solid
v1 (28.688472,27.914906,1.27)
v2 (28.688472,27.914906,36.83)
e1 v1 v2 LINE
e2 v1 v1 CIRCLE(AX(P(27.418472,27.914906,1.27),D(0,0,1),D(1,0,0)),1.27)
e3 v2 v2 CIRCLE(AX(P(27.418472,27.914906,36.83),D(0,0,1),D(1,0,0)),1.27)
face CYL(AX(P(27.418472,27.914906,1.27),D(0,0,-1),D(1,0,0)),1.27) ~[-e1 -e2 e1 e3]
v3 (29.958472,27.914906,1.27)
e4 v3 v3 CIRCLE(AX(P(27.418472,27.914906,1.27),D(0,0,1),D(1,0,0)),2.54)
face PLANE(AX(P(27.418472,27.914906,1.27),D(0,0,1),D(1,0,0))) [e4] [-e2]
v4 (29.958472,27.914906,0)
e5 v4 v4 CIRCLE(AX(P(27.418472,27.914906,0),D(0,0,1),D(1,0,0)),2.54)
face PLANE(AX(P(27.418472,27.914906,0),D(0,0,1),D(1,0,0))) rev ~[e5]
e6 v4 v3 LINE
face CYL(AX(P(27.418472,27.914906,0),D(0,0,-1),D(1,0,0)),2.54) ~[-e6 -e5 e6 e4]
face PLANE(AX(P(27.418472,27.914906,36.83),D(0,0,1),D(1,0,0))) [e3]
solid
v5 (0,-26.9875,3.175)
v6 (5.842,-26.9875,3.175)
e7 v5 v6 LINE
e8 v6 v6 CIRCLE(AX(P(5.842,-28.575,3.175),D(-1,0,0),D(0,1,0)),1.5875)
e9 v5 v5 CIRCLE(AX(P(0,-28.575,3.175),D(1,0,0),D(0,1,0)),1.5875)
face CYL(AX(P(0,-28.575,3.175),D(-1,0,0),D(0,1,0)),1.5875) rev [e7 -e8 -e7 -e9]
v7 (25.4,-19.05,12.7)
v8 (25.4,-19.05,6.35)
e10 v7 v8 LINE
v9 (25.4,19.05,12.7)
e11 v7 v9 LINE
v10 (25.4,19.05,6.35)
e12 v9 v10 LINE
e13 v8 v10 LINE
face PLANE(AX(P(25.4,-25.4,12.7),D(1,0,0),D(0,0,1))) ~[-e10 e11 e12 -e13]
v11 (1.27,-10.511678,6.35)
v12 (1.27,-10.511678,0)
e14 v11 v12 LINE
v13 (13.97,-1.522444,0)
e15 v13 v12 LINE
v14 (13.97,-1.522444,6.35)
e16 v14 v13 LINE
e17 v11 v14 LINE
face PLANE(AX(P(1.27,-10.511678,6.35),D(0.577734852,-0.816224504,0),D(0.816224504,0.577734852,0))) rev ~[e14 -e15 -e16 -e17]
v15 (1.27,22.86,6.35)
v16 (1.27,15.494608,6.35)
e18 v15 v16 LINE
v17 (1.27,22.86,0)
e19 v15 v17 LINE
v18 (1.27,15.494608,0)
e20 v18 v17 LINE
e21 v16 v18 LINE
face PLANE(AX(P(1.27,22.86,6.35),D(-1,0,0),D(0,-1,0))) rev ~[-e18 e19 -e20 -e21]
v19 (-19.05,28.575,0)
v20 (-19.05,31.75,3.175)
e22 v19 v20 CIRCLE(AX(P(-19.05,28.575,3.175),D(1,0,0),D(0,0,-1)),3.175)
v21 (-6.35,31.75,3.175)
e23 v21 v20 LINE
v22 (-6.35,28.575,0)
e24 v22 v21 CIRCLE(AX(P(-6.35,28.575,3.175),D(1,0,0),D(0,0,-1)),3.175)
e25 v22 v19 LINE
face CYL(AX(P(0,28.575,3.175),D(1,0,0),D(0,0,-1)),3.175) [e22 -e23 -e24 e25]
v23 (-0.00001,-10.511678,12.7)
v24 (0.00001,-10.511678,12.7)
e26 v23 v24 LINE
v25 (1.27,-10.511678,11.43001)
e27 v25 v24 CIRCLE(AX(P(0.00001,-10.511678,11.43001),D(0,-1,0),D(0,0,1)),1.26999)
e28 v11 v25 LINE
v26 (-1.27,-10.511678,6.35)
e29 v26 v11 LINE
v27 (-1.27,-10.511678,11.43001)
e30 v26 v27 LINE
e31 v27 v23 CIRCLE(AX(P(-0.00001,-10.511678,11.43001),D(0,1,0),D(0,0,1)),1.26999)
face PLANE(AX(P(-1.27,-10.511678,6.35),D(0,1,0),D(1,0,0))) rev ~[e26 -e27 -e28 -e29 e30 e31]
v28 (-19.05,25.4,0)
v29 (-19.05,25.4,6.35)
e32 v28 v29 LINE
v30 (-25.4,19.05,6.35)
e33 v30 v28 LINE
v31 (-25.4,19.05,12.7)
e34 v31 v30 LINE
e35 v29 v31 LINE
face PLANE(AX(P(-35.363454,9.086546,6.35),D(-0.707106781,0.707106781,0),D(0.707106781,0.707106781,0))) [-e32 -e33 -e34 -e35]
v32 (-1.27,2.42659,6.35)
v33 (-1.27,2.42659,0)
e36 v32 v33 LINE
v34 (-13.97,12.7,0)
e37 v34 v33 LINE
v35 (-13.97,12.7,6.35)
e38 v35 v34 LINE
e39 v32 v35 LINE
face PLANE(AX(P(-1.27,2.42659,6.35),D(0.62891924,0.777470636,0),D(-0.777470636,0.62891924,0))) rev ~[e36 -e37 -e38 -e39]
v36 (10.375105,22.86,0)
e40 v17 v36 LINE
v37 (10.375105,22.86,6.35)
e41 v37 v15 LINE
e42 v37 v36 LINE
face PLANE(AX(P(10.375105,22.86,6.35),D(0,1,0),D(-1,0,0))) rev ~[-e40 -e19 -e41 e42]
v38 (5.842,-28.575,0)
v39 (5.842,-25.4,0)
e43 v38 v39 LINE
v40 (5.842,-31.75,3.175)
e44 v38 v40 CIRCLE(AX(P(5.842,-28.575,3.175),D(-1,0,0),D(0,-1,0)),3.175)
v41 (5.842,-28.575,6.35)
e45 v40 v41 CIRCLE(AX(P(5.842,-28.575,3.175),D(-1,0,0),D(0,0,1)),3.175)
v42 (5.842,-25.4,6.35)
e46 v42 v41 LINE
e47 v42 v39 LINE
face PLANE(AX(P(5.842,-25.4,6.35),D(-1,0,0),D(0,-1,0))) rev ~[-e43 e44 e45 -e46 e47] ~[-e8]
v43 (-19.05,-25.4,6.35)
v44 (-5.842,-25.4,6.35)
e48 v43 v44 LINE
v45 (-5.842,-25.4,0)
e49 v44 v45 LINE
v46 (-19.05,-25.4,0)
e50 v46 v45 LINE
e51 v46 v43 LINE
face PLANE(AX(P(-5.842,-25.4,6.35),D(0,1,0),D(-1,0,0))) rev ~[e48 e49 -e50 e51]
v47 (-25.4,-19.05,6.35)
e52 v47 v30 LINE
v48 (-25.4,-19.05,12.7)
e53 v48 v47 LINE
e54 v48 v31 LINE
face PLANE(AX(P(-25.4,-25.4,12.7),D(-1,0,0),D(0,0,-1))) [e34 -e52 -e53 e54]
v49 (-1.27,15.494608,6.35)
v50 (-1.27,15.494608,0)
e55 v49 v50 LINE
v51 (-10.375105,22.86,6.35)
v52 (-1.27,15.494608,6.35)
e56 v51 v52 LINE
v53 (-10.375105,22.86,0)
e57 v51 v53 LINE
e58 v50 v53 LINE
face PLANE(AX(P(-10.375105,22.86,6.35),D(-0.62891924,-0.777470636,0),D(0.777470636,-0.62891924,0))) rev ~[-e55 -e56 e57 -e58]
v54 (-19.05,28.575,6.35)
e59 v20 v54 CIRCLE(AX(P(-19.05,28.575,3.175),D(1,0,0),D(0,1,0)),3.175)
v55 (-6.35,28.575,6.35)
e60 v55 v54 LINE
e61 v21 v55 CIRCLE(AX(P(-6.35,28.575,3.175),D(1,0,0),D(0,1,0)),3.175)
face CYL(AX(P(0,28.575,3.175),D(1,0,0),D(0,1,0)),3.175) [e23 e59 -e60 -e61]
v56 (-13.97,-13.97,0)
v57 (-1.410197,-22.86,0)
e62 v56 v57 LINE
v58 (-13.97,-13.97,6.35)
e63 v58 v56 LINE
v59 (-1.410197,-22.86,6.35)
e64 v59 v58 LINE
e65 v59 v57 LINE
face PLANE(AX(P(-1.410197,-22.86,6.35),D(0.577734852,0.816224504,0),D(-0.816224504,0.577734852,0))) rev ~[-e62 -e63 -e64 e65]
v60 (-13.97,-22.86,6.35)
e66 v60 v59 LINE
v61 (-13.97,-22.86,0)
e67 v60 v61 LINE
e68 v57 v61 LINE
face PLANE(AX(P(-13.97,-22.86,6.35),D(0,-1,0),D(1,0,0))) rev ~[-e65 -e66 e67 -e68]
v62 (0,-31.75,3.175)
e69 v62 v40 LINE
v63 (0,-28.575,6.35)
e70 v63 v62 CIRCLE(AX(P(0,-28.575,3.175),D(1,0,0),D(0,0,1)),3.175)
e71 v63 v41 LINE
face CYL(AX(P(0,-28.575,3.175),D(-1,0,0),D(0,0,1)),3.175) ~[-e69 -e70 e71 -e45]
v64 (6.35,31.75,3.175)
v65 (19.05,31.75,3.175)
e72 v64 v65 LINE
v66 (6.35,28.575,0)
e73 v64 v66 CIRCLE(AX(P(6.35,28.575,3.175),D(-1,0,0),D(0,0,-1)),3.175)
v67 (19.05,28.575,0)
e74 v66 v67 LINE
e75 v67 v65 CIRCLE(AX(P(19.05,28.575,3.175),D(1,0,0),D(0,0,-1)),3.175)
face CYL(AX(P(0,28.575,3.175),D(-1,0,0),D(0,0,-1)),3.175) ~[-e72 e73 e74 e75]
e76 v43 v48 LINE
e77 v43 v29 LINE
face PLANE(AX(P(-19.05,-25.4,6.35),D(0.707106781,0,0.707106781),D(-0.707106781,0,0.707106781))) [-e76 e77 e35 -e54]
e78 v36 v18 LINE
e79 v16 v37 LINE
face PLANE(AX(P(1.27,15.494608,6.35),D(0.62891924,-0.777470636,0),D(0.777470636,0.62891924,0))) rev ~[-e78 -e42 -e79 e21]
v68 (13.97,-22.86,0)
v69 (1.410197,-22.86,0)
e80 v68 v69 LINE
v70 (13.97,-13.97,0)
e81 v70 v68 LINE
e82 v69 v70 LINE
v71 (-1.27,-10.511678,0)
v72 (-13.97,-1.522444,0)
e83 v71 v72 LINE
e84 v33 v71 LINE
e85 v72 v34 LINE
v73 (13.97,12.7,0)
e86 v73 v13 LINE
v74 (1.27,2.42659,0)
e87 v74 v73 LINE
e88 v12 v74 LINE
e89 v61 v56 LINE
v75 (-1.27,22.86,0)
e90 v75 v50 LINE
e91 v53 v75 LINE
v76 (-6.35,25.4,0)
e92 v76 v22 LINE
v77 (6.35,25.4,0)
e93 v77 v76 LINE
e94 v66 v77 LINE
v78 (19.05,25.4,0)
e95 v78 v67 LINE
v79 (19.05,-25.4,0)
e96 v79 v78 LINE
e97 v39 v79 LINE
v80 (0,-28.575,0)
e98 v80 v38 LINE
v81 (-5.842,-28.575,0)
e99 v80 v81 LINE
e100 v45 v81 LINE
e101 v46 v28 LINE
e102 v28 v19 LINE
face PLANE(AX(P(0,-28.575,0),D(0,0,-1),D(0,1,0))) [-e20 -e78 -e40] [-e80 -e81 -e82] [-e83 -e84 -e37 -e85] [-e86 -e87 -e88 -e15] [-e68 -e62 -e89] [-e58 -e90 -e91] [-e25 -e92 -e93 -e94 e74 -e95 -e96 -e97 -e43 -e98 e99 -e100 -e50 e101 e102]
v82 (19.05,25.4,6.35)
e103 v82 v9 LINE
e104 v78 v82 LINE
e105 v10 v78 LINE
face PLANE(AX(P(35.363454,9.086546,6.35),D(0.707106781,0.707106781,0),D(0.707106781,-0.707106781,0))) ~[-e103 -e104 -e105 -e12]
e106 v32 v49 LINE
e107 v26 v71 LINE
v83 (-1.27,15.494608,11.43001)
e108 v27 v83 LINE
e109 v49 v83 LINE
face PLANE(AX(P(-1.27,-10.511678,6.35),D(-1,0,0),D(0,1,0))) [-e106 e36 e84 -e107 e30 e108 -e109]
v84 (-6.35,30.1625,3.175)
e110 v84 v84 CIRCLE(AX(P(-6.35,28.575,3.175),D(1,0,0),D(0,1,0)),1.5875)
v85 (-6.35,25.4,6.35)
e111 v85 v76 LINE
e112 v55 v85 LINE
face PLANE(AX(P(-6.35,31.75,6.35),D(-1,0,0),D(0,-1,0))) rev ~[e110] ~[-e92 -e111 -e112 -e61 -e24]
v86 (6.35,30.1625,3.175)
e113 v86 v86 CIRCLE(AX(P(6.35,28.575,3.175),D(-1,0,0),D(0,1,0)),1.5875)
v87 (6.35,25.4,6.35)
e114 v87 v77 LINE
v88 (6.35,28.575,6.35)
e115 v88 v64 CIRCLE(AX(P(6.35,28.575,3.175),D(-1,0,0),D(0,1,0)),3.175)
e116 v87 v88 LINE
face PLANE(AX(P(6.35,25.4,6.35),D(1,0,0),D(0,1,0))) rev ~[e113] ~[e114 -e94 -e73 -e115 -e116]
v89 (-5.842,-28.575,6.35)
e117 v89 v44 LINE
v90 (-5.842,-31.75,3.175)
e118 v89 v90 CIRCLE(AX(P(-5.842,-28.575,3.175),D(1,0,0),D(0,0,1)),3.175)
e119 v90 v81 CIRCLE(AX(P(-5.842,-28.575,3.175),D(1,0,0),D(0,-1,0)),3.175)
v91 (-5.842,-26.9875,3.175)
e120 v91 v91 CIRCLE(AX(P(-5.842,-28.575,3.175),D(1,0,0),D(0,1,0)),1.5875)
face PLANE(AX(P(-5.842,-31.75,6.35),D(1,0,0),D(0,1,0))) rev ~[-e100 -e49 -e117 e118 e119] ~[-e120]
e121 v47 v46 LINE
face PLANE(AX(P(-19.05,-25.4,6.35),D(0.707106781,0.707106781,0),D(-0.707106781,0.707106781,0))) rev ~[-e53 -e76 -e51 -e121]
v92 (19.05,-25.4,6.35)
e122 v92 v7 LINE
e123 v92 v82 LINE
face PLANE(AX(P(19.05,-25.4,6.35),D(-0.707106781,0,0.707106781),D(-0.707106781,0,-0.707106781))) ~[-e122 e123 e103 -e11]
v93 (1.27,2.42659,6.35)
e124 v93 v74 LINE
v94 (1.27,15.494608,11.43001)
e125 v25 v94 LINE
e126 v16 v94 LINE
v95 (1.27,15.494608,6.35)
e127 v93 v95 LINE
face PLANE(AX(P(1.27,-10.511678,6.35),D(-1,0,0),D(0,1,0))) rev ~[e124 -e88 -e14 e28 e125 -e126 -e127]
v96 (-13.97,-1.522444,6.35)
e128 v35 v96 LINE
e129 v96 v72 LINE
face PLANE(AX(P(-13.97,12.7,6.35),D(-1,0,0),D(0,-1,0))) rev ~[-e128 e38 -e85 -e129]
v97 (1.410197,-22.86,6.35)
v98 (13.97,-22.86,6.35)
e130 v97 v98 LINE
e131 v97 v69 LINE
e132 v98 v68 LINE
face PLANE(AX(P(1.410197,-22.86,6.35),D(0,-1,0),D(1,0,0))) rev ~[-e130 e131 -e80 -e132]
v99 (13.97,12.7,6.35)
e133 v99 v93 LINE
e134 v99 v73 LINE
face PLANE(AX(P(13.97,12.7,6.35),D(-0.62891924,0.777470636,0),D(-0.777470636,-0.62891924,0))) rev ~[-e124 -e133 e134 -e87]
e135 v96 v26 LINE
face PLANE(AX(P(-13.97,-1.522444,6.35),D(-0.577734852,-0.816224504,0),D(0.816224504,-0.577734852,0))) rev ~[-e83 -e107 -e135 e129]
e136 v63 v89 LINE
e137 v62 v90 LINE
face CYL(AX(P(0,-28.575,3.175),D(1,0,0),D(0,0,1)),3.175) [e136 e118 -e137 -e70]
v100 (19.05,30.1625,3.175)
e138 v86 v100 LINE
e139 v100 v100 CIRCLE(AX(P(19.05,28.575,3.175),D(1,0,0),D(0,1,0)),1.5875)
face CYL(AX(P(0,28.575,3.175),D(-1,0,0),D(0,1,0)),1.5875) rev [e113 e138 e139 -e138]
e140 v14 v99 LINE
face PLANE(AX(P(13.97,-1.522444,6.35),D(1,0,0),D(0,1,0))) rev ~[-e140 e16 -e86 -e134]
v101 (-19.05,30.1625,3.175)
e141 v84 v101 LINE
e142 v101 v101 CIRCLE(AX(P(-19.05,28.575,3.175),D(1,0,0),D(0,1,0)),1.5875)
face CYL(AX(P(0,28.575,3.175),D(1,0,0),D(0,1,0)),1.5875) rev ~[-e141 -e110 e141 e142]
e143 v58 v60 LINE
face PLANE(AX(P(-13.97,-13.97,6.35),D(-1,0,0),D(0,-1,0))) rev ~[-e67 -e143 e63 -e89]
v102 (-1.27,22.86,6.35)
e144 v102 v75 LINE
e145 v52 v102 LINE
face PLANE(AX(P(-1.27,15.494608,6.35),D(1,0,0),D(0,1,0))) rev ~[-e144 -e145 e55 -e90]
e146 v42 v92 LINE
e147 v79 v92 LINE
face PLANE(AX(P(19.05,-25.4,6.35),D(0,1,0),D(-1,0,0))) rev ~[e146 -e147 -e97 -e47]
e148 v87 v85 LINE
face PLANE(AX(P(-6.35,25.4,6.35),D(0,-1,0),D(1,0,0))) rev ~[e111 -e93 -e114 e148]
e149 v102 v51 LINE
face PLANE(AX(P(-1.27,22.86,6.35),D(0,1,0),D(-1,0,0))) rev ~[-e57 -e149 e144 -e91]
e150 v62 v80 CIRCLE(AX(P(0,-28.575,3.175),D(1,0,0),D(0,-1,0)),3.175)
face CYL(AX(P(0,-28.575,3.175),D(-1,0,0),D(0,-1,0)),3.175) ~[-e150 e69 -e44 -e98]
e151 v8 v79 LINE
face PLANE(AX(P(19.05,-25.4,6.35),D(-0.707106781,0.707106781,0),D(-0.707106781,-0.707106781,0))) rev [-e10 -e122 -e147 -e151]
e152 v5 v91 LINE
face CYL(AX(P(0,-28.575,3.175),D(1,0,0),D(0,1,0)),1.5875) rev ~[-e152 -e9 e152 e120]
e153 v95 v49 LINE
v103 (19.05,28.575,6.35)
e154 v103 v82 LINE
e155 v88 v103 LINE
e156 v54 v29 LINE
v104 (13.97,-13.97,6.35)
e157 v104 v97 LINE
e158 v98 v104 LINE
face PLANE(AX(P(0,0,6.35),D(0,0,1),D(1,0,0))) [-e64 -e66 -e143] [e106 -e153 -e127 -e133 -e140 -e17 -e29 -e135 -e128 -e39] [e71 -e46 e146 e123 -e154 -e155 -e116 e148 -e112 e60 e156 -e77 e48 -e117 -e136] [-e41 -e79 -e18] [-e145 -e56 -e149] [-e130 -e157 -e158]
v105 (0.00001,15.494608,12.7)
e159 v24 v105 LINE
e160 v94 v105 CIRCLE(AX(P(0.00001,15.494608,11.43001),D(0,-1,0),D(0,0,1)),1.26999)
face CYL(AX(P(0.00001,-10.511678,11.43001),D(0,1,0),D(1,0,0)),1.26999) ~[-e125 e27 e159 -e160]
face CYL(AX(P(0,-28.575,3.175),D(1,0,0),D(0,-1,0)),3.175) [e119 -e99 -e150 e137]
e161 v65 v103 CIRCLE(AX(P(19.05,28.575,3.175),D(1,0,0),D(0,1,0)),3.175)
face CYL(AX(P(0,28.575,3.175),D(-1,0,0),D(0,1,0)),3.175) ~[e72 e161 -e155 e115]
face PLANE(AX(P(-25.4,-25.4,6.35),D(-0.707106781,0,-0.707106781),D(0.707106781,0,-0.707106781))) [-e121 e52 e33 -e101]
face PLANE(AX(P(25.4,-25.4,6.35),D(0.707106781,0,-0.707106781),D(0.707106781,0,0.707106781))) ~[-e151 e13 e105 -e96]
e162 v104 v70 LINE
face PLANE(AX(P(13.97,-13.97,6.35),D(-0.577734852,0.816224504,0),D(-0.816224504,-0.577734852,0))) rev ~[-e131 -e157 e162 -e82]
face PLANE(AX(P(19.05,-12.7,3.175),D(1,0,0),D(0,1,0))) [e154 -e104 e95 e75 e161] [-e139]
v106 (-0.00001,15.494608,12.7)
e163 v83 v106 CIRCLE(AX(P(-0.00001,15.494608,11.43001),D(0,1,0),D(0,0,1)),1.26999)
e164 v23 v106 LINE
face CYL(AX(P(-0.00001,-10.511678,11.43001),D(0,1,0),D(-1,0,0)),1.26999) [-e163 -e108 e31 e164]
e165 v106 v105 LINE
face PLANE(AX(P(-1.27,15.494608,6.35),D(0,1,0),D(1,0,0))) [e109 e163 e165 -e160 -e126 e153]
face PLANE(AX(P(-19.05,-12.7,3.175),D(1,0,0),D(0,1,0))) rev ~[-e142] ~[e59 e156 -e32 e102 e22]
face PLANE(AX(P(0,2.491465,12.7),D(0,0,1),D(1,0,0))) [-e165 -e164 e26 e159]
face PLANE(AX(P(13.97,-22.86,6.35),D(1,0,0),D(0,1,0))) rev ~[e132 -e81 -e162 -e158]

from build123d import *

# Parameters (mm, degrees)
F0_W      = 38.1
F0_H      = 50.8
F1_DEPTH  = 6.35
F3_DEPTH  = 50.8
F4_W      = 25.4
F4_H      = 6.35
F4_R      = 1.5875
F5_DEPTH  = 19.05
F6_W      = 12.7
F6_H      = 3.175
F6_W_2    = 0.508
F7_DEPTH  = 25.4
F9_DEPTH  = 12.7
F13_DEPTH = 6.351
F14_W     = 2.54
F14_H     = 26.006285722
F15_DEPTH = 6.35
F16_R     = 1.26999
F17_R     = 2.54
F18_DEPTH = 1.27
F19_R     = 1.27
F20_DEPTH = 35.56


# Not quite as in the source:
# - a fillet or chamfer is up to 0.001 mm smaller than in the source, because OpenCascade refuses the exact size


with BuildPart() as f1:
    # F0 (on Top) → F1 (new body)
    with BuildSketch(Plane.XY):
        Rectangle(F0_W, F0_H)
    extrude(amount=F1_DEPTH)

    # F2 (on face) → F3 (join, through all)
    with BuildSketch(Plane.XZ.offset(25.4)):
        Polygon((-19.05, 0), (-19.05, 6.35), (-25.4, 12.7), (-25.4, 6.35), align=None)
    extrude(amount=-F3_DEPTH)

    # F4 (on Right) → F5 (join, symmetric)
    with BuildSketch(Plane.YZ):
        with Locations((-12.7, 3.175)):
            Rectangle(F4_W, F4_H)
        with Locations((12.7, 3.175)):
            Rectangle(F4_W, F4_H)
        with BuildLine():
            Line((-28.575, 0), (-25.4, 0))
            Line((-25.4, 0), (-25.4, 6.35))
            Line((-25.4, 6.35), (-28.575, 6.35))
            ThreePointArc((-28.575, 6.35), (-30.8200640303, 5.4200640303), (-31.75, 3.175))
            ThreePointArc((-31.75, 3.175), (-30.8200640303, 0.9299359697), (-28.575, 0))
        make_face()
        with Locations((-28.575, 3.175)):
            Circle(F4_R, mode=Mode.SUBTRACT)
        with BuildLine():
            Line((25.4, 6.35), (25.4, 0))
            Line((25.4, 0), (28.575, 0))
            ThreePointArc((28.575, 0), (30.8200640303, 0.9299359697), (31.75, 3.175))
            ThreePointArc((31.75, 3.175), (30.8200640303, 5.4200640303), (28.575, 6.35))
            Line((28.575, 6.35), (25.4, 6.35))
        make_face()
        with Locations((28.575, 3.175)):
            Circle(F4_R, mode=Mode.SUBTRACT)
    extrude(amount=F5_DEPTH, both=True)

    # F6 (on face) → F7 (cut)
    with BuildSketch(Plane.XY.offset(6.35)):
        with Locations((0, 30.1625)):
            Rectangle(F6_W, F6_H)
        with Locations((0, 26.9875)):
            Rectangle(F6_W, F6_H)
        with Locations((12.7, -30.1625)):
            Rectangle(F6_W, F6_H)
        with Locations((12.7, -26.9875)):
            Rectangle(F6_W, F6_H)
        with Locations((6.096, -26.9875)):
            Rectangle(F6_W_2, F6_H)
        with Locations((6.096, -30.1625)):
            Rectangle(F6_W_2, F6_H)
        with Locations((-12.7, -30.1625)):
            Rectangle(F6_W, F6_H)
        with Locations((-12.7, -26.9875)):
            Rectangle(F6_W, F6_H)
        with Locations((-6.096, -26.9875)):
            Rectangle(F6_W_2, F6_H)
        with Locations((-6.096, -30.1625)):
            Rectangle(F6_W_2, F6_H)
    extrude(amount=-F7_DEPTH, mode=Mode.SUBTRACT)

    # F8 (on face) → F9 (cut, symmetric)
    with BuildSketch(Plane.XY.offset(6.35)):
        Polygon((-35.3634544947, 9.0865455053), (-19.05, 25.4), (-35.675508843, 25.4), align=None)
        Polygon((-34.7037734637, -25.4), (-19.05, -25.4), (-35.0090485041, -9.4409514959), align=None)
    extrude(amount=F9_DEPTH, both=True, mode=Mode.SUBTRACT)

    # F11: F1 across plane


with BuildPart() as f1_1:
    add(f1.part)
    add(f1.part.mirror(Plane(origin=(0, 2.2576834917, 3.175), x_dir=(0, 1, 0), z_dir=(1, 0, 0))))

    # F12 (on face) → F13 (cut, through all)
    with BuildSketch(Plane.XY.offset(6.35)):
        Polygon((-1.27, 22.86), (-10.3751054608, 22.86), (-1.27, 15.4946079875), align=None)
        Polygon((10.3751054608, 22.86), (1.27, 22.86), (1.27, 15.4946079875), align=None)
        Polygon((-1.27, 0), (-13.97, 0), (-13.97, -1.5224442665), (-1.27, -10.5116777345), align=None)
        Polygon((13.97, 0), (1.27, 0), (1.27, -10.5116777345), (13.97, -1.5224442665), align=None)
        Polygon((13.97, -13.97), (1.4101971646, -22.86), (13.97, -22.86), align=None)
        Polygon((-1.4101971646, -22.86), (-13.97, -13.97), (-13.97, -22.86), align=None)
        Polygon((-1.27, 2.4265903223), (-13.97, 12.7), (-13.97, 0), (-1.27, 0), align=None)
        Polygon((1.27, 2.4265903223), (1.27, 0), (13.97, 0), (13.97, 12.7), align=None)
    extrude(amount=-F13_DEPTH, mode=Mode.SUBTRACT)

    # F14 (on face) → F15 (join)
    with BuildSketch(Plane.XY.offset(6.35)):
        with Locations((0, 2.4914651265)):
            Rectangle(F14_W, F14_H)
    extrude(amount=F15_DEPTH)

    # F16 (radius 1.27 in the source; OpenCascade refuses exactly that, so slightly less here)
    f16_edges = [f1_1.edges().sort_by_distance(p)[0] for p in [
        (-1.27, 2.491465, 12.7),
        (1.27, 2.491465, 12.7),
    ]]
    fillet(f16_edges, radius=F16_R)


with BuildPart() as f18:
    # F17 (on face) → F18 (new body)
    with BuildSketch(Plane.XY):
        with Locations((27.4184718728, 27.9149059206)):
            Circle(F17_R)
    extrude(amount=F18_DEPTH)

    # F19 (on face) → F20 (join)
    with BuildSketch(Plane.XY.offset(1.27)):
        with Locations((27.4184718728, 27.9149059206)):
            Circle(F19_R)
    extrude(amount=F20_DEPTH)


solid = Compound([f1_1.part, f18.part])
